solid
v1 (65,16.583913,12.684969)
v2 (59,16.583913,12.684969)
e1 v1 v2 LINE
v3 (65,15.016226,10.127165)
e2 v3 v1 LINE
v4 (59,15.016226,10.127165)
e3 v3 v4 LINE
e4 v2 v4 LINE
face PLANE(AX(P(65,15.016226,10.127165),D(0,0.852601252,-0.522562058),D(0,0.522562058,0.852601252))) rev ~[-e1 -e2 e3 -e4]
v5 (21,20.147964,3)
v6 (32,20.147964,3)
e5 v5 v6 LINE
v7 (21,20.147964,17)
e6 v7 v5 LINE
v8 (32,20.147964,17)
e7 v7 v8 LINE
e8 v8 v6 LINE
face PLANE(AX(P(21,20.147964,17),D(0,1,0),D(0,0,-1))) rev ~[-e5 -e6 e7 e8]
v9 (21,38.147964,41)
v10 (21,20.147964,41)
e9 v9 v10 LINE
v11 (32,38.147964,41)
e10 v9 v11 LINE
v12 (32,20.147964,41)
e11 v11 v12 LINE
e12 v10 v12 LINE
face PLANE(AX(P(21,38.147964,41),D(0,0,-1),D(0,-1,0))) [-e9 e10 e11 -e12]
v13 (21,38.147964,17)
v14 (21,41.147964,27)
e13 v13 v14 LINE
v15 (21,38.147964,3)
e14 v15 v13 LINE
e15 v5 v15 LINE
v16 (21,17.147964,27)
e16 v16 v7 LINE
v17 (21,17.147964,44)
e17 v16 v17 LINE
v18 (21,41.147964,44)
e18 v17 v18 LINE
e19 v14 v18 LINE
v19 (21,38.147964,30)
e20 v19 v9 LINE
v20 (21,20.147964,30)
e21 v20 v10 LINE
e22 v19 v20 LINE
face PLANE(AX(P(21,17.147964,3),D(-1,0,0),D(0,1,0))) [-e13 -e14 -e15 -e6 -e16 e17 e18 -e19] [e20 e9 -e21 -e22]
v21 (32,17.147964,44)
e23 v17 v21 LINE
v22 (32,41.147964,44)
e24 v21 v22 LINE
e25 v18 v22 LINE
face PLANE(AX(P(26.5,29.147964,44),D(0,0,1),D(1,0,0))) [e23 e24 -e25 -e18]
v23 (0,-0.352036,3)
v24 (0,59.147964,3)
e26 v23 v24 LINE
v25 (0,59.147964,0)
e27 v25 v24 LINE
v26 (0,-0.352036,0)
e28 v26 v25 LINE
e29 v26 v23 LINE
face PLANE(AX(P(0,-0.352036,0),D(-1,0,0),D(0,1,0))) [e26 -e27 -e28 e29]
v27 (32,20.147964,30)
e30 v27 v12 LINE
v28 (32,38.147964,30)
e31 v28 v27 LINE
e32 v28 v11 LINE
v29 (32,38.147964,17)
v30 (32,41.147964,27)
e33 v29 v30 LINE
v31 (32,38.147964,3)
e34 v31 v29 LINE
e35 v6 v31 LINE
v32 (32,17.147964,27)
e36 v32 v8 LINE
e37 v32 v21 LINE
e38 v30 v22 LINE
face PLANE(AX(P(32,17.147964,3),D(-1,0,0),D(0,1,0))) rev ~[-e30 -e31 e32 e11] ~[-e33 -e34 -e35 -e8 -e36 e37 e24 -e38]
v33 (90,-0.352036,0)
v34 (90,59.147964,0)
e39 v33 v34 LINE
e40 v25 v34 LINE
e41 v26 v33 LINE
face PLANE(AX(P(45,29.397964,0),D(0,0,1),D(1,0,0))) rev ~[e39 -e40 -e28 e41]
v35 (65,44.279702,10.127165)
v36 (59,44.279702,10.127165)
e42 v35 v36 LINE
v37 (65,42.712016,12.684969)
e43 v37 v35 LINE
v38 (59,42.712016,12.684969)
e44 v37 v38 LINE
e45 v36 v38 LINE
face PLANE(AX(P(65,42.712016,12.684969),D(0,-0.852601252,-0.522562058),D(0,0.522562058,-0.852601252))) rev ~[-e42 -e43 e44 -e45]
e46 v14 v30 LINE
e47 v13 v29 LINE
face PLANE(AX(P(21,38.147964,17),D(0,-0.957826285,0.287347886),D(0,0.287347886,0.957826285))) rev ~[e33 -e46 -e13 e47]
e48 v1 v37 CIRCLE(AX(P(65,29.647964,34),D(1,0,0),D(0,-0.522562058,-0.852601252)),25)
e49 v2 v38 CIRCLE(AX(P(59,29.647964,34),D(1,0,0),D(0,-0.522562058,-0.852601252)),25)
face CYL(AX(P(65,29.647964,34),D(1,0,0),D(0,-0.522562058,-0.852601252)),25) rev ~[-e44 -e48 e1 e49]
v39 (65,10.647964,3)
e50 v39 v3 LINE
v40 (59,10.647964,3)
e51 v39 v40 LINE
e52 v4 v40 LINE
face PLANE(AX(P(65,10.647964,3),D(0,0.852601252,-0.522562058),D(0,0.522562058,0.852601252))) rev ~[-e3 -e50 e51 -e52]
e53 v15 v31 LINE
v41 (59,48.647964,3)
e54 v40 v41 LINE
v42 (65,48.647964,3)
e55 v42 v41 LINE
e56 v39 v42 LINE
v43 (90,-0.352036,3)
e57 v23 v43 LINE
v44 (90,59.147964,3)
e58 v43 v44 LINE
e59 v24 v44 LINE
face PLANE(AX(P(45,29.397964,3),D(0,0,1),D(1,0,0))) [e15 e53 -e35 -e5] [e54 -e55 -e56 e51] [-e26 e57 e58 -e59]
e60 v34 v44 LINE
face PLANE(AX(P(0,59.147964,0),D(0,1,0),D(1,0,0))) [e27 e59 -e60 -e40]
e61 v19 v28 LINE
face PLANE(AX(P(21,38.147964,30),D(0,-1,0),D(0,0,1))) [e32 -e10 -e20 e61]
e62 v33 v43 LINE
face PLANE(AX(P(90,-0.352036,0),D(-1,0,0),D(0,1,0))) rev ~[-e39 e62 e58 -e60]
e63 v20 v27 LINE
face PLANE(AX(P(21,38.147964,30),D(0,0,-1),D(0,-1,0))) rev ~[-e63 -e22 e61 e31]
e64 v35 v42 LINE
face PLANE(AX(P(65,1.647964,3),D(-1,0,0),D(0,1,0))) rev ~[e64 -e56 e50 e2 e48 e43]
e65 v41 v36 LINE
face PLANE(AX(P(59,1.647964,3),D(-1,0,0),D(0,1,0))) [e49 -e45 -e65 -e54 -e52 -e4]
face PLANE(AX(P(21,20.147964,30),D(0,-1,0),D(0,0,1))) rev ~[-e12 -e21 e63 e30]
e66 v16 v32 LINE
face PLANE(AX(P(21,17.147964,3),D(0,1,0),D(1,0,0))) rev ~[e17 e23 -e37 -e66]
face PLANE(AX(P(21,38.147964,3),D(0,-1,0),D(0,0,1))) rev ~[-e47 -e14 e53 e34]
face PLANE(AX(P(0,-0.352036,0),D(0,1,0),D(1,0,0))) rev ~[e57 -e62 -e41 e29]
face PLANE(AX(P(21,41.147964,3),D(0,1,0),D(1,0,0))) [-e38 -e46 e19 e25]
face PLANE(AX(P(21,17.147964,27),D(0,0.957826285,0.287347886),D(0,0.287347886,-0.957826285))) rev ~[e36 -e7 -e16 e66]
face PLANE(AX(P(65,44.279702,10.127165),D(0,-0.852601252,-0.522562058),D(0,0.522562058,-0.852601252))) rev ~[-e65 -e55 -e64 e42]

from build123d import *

# Parameters (mm, degrees)
F0_W     = 90
F0_H     = 59.5
F1_DEPTH = 3
F2_W     = 11
F2_H     = 24
F3_DEPTH = 41
F2_W_2   = 6
F2_H_2   = 56
F4_DEPTH = 31
F5_W     = 18
F5_H     = 11
F6_DEPTH = 15
F8_DEPTH = 10


with BuildPart() as f1:
    # F0 (on Top) → F1 (new body)
    with BuildSketch(Plane.XY):
        with Locations((45, 29.3979640784)):
            Rectangle(F0_W, F0_H)
    extrude(amount=F1_DEPTH)

    # F2 (on face) → F3 (join)
    with BuildSketch(Plane.XY.offset(3)):
        with Locations((26.5, 29.1479640784)):
            Rectangle(F2_W, F2_H)
    extrude(amount=F3_DEPTH)

    # F2 (on face) → F4 (join)
    with BuildSketch(Plane.XY.offset(3)):
        with Locations((62, 29.6479640784)):
            Rectangle(F2_W_2, F2_H_2)
    extrude(amount=F4_DEPTH)

    # F5 (on face) → F6 (cut)
    with BuildSketch(Plane(origin=(21, 0, 0), x_dir=(0, -1, 0), z_dir=(-1, 0, 0))):
        Polygon((-41.1479640784, 27), (-41.1479640784, 3), (-38.1479640784, 3), (-38.1479640784, 17), align=None)
        with Locations((-29.1479640784, 35.5)):
            Rectangle(F5_W, F5_H)
        Polygon((-20.1479640784, 17), (-20.1479640784, 3), (-17.1479640784, 3), (-17.1479640784, 27), align=None)
    extrude(amount=-F6_DEPTH, mode=Mode.SUBTRACT)

    # F7 (on face) → F8 (cut)
    with BuildSketch(Plane.YZ.offset(65)):
        with BuildLine():
            Line((29.6479640784, 34), (4.6479640784, 34))
            ThreePointArc((4.6479640784, 34), (7.8351090818, 21.7852811372), (16.5839126302, 12.6849686897))
            Line((16.5839126302, 12.6849686897), (29.6479640784, 34))
        make_face()
        with BuildLine():
            ThreePointArc((16.5839126302, 12.6849686897), (29.6479640784, 9), (42.7120155267, 12.6849686897))
            Line((42.7120155267, 12.6849686897), (29.6479640784, 34))
            Line((29.6479640784, 34), (16.5839126302, 12.6849686897))
        make_face()
        with BuildLine():
            ThreePointArc((42.7120155267, 12.6849686897), (51.460819075, 21.7852811372), (54.6479640784, 34))
            Line((54.6479640784, 34), (29.6479640784, 34))
            Line((29.6479640784, 34), (42.7120155267, 12.6849686897))
        make_face()
        with BuildLine():
            ThreePointArc((16.5839126302, 12.6849686897), (7.8351090818, 21.7852811372), (4.6479640784, 34))
            Line((4.6479640784, 34), (1.6479640784, 34))
            ThreePointArc((1.6479640784, 34), (5.2175664822, 20.3195148737), (15.0162264564, 10.1271649325))
            Line((15.0162264564, 10.1271649325), (16.5839126302, 12.6849686897))
        make_face()
        with BuildLine():
            ThreePointArc((15.0162264564, 10.1271649325), (5.2175664822, 20.3195148737), (1.6479640784, 34))
            Line((1.6479640784, 34), (1.6479640784, 3))
            Line((1.6479640784, 3), (10.6479640784, 3))
            Line((10.6479640784, 3), (15.0162264564, 10.1271649325))
        make_face()
        with BuildLine():
            Line((57.6479640784, 3), (57.6479640784, 34))
            ThreePointArc((57.6479640784, 34), (54.0783616746, 20.3195148737), (44.2797017005, 10.1271649325))
            Line((44.2797017005, 10.1271649325), (48.6479640784, 3))
            Line((48.6479640784, 3), (57.6479640784, 3))
        make_face()
        with BuildLine():
            Line((57.6479640784, 34), (54.6479640784, 34))
            ThreePointArc((54.6479640784, 34), (51.460819075, 21.7852811372), (42.7120155267, 12.6849686897))
            Line((42.7120155267, 12.6849686897), (44.2797017005, 10.1271649325))
            ThreePointArc((44.2797017005, 10.1271649325), (54.0783616746, 20.3195148737), (57.6479640784, 34))
        make_face()
    extrude(amount=-F8_DEPTH, mode=Mode.SUBTRACT)


solid = f1.part
